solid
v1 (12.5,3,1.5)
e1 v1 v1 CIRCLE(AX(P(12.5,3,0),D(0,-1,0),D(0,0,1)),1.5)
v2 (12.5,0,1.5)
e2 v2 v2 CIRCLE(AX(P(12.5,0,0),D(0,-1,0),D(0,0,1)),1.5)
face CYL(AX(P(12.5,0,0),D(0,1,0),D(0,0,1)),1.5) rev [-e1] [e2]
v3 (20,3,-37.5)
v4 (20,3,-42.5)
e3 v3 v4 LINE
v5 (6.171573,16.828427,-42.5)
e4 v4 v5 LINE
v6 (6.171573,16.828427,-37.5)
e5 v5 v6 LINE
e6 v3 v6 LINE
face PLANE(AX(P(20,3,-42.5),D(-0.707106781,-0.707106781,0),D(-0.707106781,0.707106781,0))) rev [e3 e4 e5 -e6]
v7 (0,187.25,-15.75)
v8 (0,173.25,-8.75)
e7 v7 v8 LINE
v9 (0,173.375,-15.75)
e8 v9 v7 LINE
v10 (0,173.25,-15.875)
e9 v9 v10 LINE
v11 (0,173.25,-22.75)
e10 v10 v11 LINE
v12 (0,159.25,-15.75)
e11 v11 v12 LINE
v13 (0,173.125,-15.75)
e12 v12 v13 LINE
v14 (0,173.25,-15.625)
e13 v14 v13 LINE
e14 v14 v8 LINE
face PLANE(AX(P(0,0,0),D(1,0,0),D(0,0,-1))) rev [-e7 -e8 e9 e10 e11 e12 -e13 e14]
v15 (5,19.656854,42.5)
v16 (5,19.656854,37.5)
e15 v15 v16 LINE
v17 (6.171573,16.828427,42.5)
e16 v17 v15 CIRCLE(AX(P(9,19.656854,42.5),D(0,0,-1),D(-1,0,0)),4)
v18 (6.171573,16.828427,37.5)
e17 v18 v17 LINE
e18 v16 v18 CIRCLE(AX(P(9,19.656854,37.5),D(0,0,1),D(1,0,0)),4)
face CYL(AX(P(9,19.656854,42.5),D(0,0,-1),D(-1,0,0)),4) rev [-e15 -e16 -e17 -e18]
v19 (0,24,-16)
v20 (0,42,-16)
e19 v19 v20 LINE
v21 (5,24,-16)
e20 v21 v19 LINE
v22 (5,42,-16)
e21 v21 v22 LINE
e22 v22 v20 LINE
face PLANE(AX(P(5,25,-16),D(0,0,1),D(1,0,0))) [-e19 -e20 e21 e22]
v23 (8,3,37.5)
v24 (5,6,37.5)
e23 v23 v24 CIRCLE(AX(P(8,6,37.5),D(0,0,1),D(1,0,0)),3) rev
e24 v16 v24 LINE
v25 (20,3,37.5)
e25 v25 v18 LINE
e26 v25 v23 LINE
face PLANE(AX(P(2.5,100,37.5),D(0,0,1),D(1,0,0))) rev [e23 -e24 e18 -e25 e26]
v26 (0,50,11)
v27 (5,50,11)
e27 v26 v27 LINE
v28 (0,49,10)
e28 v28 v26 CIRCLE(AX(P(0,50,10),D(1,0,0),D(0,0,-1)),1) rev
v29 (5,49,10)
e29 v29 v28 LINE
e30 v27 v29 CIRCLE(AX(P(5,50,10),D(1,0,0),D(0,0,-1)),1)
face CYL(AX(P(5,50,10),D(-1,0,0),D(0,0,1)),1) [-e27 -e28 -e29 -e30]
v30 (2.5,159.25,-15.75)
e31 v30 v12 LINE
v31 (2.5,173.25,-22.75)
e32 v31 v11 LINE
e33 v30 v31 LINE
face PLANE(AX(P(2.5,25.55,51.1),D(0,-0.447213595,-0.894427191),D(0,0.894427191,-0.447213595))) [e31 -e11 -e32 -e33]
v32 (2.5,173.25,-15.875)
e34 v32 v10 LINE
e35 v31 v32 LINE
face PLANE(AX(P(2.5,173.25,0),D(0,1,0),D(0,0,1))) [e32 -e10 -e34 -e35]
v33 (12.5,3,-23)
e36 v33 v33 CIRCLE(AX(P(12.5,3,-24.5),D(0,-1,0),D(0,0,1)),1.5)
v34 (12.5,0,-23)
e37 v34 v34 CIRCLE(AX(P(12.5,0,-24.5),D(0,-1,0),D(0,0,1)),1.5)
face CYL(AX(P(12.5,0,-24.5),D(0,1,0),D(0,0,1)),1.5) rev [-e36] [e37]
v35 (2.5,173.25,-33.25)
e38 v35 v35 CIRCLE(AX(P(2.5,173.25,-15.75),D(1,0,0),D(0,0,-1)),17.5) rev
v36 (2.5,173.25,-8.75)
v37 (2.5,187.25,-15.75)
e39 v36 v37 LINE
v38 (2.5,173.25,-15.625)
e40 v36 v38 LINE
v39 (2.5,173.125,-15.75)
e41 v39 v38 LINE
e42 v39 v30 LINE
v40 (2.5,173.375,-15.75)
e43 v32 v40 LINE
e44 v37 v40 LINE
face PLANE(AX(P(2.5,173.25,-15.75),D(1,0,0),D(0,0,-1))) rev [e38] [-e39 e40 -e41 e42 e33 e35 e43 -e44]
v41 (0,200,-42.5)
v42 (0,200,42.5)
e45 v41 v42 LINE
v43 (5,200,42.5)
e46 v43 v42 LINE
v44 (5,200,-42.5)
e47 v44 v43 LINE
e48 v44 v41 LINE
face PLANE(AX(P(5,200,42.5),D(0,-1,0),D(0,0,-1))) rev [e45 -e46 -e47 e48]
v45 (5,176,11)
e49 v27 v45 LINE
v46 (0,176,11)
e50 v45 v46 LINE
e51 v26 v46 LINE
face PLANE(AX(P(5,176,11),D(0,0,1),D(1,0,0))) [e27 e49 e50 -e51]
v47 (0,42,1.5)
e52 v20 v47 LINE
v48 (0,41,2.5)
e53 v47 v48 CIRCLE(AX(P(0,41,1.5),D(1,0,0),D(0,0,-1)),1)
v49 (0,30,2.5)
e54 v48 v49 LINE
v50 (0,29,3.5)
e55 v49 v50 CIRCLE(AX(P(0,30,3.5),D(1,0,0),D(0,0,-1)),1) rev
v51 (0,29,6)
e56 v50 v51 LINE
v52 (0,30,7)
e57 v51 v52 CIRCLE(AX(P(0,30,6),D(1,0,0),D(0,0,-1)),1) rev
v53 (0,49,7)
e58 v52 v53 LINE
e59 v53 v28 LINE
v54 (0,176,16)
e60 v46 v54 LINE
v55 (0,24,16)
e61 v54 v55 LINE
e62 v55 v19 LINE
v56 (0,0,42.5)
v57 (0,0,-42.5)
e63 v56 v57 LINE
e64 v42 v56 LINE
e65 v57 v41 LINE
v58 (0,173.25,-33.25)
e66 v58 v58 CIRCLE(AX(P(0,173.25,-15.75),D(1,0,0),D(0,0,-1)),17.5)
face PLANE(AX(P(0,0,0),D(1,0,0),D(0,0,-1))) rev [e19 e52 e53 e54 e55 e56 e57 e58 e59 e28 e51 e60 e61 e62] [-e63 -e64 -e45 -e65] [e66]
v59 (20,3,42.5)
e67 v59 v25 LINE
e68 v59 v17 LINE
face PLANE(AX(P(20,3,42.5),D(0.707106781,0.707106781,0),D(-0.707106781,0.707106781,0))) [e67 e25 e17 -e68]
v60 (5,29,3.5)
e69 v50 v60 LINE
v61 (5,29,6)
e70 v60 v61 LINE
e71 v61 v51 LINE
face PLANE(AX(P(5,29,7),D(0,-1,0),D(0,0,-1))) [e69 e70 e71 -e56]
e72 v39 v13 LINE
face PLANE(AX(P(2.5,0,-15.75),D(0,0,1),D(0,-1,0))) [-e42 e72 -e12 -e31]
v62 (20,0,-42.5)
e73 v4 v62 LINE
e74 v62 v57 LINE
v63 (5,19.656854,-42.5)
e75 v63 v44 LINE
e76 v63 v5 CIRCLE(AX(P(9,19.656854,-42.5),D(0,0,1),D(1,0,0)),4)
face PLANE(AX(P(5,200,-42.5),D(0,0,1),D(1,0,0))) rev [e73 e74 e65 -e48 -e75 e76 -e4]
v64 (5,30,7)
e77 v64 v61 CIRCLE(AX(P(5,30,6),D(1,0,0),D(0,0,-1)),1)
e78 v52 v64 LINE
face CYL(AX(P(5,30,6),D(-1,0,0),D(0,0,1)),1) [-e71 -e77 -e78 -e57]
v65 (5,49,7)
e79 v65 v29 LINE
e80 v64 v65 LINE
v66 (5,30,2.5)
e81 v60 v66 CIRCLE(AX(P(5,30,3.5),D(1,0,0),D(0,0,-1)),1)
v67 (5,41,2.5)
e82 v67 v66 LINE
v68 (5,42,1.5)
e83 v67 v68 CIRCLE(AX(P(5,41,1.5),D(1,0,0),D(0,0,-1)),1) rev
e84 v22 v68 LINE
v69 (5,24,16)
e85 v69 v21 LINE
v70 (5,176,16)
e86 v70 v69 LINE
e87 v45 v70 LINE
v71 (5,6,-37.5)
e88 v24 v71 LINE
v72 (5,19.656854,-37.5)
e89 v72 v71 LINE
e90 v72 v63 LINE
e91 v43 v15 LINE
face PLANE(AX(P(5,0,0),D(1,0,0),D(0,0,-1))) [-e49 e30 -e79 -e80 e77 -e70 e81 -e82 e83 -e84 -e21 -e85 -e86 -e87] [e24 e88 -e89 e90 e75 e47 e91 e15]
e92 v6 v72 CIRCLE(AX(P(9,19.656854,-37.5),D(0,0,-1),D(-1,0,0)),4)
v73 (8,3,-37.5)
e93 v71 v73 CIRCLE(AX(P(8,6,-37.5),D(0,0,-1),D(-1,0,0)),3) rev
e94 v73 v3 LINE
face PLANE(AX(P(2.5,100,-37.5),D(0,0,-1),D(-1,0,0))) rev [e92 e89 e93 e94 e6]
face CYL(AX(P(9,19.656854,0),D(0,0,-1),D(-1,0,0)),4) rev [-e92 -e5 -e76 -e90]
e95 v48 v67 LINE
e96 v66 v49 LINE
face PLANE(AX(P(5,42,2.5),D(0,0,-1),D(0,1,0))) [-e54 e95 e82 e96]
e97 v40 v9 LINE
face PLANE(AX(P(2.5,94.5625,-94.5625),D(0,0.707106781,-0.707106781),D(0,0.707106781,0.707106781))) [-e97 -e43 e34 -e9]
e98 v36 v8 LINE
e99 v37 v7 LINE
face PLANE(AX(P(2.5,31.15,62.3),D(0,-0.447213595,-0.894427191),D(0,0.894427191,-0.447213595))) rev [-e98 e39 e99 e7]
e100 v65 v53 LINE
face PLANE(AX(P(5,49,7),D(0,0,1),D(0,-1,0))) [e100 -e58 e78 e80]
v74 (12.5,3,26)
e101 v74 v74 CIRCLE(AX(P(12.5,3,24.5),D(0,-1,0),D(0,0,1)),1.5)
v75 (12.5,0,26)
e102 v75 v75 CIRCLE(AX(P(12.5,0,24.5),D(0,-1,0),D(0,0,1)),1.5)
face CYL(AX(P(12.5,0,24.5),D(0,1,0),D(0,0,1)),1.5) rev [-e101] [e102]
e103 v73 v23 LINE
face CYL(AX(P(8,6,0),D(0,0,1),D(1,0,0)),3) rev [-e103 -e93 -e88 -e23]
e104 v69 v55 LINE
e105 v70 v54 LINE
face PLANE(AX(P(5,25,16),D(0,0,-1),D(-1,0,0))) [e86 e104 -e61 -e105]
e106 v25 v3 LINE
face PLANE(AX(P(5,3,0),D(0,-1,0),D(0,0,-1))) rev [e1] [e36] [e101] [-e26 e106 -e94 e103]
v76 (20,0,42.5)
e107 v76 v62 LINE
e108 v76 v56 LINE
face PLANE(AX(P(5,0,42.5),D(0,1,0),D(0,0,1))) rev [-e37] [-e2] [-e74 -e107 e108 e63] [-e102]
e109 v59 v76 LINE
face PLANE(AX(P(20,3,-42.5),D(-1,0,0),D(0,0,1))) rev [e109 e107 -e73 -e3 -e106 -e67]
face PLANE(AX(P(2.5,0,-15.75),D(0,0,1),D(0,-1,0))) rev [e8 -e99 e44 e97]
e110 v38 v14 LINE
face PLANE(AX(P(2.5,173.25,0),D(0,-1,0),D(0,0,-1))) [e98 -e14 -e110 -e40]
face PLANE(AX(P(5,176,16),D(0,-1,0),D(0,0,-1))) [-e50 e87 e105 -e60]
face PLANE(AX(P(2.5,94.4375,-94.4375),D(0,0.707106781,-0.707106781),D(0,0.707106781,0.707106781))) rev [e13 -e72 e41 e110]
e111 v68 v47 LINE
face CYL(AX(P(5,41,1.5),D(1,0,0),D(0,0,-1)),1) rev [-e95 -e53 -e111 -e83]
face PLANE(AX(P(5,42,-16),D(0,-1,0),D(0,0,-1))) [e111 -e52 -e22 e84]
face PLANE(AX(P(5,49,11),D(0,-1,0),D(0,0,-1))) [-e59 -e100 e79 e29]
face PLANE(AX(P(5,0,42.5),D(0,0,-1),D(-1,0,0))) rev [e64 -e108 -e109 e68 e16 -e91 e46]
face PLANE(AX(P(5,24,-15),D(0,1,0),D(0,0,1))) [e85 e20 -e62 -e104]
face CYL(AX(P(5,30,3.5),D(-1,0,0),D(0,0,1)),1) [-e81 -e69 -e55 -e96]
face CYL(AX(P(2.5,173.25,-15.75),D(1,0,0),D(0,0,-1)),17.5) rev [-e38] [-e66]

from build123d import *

# Parameters (mm, degrees)
SKETCH1_W               = 85
SKETCH1_H               = 200
BOSS_EXTRUDE1_DEPTH     = 5
FILLET1_R               = 1
SKETCH2_R               = 17.5
CUT_EXTRUDE1_DEPTH      = 2.5
FILLET2_R               = 0.125
SKETCH3_W               = 15
SKETCH3_H               = 85
BOSS_EXTRUDE2_DEPTH     = 3
RIB1_START              = -5
RIB1_DEPTH              = 5
SKETCH5_R               = 1.5
CUT_EXTRUDE2_DEPTH      = 3
FILLET3_R               = 4
FILLET4_R               = 3
MIRROR3_START           = -5
MIRROR3_COPY_1_DEPTH    = 5
FILLET5_R               = 4
FILLET6_R               = 3
CUT_EXTRUDE3_DEPTH      = 219.231528428
CUT_EXTRUDE3_DEPTH_BACK = 219.231528428
SKETCH7_R               = 17.5
BOSS_EXTRUDE3_DEPTH     = 2.5


# Read off the part's stored shape, not the designer's step: Rib1
with BuildPart() as part:
    # Sketch1 → Boss-Extrude1 (new body)
    with BuildSketch(Plane(origin=(0, 0, 0), x_dir=(0, 0, -1), z_dir=(1, 0, 0))):
        with Locations((0, 100)):
            Rectangle(SKETCH1_W, SKETCH1_H)
        Polygon((-16, 25), (-16, 176), (-11, 176), (-11, 49), (-7, 49), (-7, 29), (-2.5, 29), (-2.5, 42), (16, 42), (16, 25), (16, 24), (15, 24), (-15, 24), (-16, 24), align=None, mode=Mode.SUBTRACT)
    extrude(amount=BOSS_EXTRUDE1_DEPTH)

    # Fillet1
    fillet1_edges = [part.edges().sort_by_distance(p)[0] for p in [
        (2.5, 42, 2.5),
        (2.5, 29, 2.5),
        (2.5, 29, 7),
        (2.5, 49, 11),
    ]]
    fillet(fillet1_edges, radius=FILLET1_R)

    # Sketch2 → Cut-Extrude1 (cut)
    with BuildSketch(Plane(origin=(5, 0, 0), x_dir=(0, 0, -1), z_dir=(1, 0, 0))):
        with Locations((15.75, 173.25)):
            Circle(SKETCH2_R)
        Polygon((15.75, 173.125), (15.625, 173.25), (8.75, 173.25), (15.75, 187.25), (15.75, 173.375), (15.875, 173.25), (22.75, 173.25), (15.75, 159.25), align=None, mode=Mode.SUBTRACT)
    cut_extrude1 = extrude(amount=-CUT_EXTRUDE1_DEPTH, mode=Mode.SUBTRACT)

    # Fillet2
    fillet2_edges = [part.edges().sort_by_distance(p)[0] for p in [
        (3.75, 173.25, -15.625),
        (3.75, 173.125, -15.75),
        (3.75, 173.25, -15.875),
        (3.75, 173.375, -15.75),
    ]]
    fillet(fillet2_edges, radius=FILLET2_R)

    # Sketch3 → Boss-Extrude2 (add)
    with BuildSketch(Plane.XZ):
        with Locations((-7.5, 0)):
            Rectangle(SKETCH3_W, SKETCH3_H)
    boss_extrude2 = extrude(amount=-BOSS_EXTRUDE2_DEPTH)

    # Rib1 outline → Rib1 (add)
    with BuildSketch(Plane.XY.offset(42.5).offset(RIB1_START)):
        Polygon((0, 18), (-15, 3), (0, 3), align=None)
    rib1 = extrude(amount=RIB1_DEPTH)

    # Mirror1: Rib1 across plane
    add(rib1.mirror(Plane.XY))

    # Sketch5 → Cut-Extrude2 (cut)
    with BuildSketch(Plane(origin=(0, 3, 0), x_dir=(1, 0, 0), z_dir=(0, 1, 0))):
        with Locations(Location((-7.5, 24.5, 0), (0, 0, 270))):
            Circle(SKETCH5_R)
        with Locations(Location((-7.5, 0, 0), (0, 0, 270))):
            Circle(SKETCH5_R)
        with Locations(Location((-7.5, -24.5, 0), (0, 0, 270))):
            Circle(SKETCH5_R)
    cut_extrude2 = extrude(amount=-CUT_EXTRUDE2_DEPTH, mode=Mode.SUBTRACT)

    # Fillet3
    fillet3_edges = [part.edges().sort_by_distance(p)[0] for p in [
        (0, 18, 40),
        (0, 18, -40),
    ]]
    fillet(fillet3_edges, radius=FILLET3_R)

    # Fillet4
    fillet4_edges = [part.edges().sort_by_distance(p)[0] for p in [
        (0, 3, 0),
    ]]
    fillet(fillet4_edges, radius=FILLET4_R)

    # Mirror3: Boss-Extrude2, Rib1, Cut-Extrude2 across plane
    add(boss_extrude2.mirror(Plane(origin=(2.5, 0, 0), x_dir=(0, 0, 1), z_dir=(1, 0, 0))))
    add(rib1.mirror(Plane(origin=(2.5, 0, 0), x_dir=(0, 0, 1), z_dir=(1, 0, 0))))
    add(cut_extrude2.mirror(Plane(origin=(2.5, 0, 0), x_dir=(0, 0, 1), z_dir=(1, 0, 0))), mode=Mode.SUBTRACT)

    # Mirror3 copy 1 sketch → Mirror3 copy 1 (add)
    with BuildSketch(Plane(origin=(5, 0, -42.5), x_dir=(-1, 0, 0), z_dir=(0, 0, -1)).offset(MIRROR3_START)):
        Polygon((0, 18), (-15, 3), (0, 3), align=None)
    extrude(amount=MIRROR3_COPY_1_DEPTH)

    # Fillet5
    fillet5_edges = [part.edges().sort_by_distance(p)[0] for p in [
        (5, 18, 40),
        (5, 18, -40),
    ]]
    fillet(fillet5_edges, radius=FILLET5_R)

    # Fillet6
    fillet6_edges = [part.edges().sort_by_distance(p)[0] for p in [
        (5, 3, 0),
    ]]
    fillet(fillet6_edges, radius=FILLET6_R)

    # Sketch6 → Cut-Extrude3 (cut, two sides: drawn at the far end of the back side and taken through both)
    with BuildSketch(Plane.XY.offset(42.5).offset(-CUT_EXTRUDE3_DEPTH_BACK)):
        Polygon((0, 24), (0, -5.503420929), (-25.982696809, -6.518277055), (-24.822861237, 19.656854249), align=None)
    extrude(amount=CUT_EXTRUDE3_DEPTH + CUT_EXTRUDE3_DEPTH_BACK, mode=Mode.SUBTRACT)

    # Mirror4: Cut-Extrude1 across plane
    add(cut_extrude1.mirror(Plane(origin=(2.5, 0, 0), x_dir=(0, 0, 1), z_dir=(1, 0, 0))), mode=Mode.SUBTRACT)

    # Sketch7 → Boss-Extrude3 (add)
    with BuildSketch(Plane(origin=(5, 0, 0), x_dir=(0, 0, -1), z_dir=(1, 0, 0))):
        with Locations((15.75, 173.25)):
            Circle(SKETCH7_R)
    extrude(amount=-BOSS_EXTRUDE3_DEPTH)


solid = part.part
